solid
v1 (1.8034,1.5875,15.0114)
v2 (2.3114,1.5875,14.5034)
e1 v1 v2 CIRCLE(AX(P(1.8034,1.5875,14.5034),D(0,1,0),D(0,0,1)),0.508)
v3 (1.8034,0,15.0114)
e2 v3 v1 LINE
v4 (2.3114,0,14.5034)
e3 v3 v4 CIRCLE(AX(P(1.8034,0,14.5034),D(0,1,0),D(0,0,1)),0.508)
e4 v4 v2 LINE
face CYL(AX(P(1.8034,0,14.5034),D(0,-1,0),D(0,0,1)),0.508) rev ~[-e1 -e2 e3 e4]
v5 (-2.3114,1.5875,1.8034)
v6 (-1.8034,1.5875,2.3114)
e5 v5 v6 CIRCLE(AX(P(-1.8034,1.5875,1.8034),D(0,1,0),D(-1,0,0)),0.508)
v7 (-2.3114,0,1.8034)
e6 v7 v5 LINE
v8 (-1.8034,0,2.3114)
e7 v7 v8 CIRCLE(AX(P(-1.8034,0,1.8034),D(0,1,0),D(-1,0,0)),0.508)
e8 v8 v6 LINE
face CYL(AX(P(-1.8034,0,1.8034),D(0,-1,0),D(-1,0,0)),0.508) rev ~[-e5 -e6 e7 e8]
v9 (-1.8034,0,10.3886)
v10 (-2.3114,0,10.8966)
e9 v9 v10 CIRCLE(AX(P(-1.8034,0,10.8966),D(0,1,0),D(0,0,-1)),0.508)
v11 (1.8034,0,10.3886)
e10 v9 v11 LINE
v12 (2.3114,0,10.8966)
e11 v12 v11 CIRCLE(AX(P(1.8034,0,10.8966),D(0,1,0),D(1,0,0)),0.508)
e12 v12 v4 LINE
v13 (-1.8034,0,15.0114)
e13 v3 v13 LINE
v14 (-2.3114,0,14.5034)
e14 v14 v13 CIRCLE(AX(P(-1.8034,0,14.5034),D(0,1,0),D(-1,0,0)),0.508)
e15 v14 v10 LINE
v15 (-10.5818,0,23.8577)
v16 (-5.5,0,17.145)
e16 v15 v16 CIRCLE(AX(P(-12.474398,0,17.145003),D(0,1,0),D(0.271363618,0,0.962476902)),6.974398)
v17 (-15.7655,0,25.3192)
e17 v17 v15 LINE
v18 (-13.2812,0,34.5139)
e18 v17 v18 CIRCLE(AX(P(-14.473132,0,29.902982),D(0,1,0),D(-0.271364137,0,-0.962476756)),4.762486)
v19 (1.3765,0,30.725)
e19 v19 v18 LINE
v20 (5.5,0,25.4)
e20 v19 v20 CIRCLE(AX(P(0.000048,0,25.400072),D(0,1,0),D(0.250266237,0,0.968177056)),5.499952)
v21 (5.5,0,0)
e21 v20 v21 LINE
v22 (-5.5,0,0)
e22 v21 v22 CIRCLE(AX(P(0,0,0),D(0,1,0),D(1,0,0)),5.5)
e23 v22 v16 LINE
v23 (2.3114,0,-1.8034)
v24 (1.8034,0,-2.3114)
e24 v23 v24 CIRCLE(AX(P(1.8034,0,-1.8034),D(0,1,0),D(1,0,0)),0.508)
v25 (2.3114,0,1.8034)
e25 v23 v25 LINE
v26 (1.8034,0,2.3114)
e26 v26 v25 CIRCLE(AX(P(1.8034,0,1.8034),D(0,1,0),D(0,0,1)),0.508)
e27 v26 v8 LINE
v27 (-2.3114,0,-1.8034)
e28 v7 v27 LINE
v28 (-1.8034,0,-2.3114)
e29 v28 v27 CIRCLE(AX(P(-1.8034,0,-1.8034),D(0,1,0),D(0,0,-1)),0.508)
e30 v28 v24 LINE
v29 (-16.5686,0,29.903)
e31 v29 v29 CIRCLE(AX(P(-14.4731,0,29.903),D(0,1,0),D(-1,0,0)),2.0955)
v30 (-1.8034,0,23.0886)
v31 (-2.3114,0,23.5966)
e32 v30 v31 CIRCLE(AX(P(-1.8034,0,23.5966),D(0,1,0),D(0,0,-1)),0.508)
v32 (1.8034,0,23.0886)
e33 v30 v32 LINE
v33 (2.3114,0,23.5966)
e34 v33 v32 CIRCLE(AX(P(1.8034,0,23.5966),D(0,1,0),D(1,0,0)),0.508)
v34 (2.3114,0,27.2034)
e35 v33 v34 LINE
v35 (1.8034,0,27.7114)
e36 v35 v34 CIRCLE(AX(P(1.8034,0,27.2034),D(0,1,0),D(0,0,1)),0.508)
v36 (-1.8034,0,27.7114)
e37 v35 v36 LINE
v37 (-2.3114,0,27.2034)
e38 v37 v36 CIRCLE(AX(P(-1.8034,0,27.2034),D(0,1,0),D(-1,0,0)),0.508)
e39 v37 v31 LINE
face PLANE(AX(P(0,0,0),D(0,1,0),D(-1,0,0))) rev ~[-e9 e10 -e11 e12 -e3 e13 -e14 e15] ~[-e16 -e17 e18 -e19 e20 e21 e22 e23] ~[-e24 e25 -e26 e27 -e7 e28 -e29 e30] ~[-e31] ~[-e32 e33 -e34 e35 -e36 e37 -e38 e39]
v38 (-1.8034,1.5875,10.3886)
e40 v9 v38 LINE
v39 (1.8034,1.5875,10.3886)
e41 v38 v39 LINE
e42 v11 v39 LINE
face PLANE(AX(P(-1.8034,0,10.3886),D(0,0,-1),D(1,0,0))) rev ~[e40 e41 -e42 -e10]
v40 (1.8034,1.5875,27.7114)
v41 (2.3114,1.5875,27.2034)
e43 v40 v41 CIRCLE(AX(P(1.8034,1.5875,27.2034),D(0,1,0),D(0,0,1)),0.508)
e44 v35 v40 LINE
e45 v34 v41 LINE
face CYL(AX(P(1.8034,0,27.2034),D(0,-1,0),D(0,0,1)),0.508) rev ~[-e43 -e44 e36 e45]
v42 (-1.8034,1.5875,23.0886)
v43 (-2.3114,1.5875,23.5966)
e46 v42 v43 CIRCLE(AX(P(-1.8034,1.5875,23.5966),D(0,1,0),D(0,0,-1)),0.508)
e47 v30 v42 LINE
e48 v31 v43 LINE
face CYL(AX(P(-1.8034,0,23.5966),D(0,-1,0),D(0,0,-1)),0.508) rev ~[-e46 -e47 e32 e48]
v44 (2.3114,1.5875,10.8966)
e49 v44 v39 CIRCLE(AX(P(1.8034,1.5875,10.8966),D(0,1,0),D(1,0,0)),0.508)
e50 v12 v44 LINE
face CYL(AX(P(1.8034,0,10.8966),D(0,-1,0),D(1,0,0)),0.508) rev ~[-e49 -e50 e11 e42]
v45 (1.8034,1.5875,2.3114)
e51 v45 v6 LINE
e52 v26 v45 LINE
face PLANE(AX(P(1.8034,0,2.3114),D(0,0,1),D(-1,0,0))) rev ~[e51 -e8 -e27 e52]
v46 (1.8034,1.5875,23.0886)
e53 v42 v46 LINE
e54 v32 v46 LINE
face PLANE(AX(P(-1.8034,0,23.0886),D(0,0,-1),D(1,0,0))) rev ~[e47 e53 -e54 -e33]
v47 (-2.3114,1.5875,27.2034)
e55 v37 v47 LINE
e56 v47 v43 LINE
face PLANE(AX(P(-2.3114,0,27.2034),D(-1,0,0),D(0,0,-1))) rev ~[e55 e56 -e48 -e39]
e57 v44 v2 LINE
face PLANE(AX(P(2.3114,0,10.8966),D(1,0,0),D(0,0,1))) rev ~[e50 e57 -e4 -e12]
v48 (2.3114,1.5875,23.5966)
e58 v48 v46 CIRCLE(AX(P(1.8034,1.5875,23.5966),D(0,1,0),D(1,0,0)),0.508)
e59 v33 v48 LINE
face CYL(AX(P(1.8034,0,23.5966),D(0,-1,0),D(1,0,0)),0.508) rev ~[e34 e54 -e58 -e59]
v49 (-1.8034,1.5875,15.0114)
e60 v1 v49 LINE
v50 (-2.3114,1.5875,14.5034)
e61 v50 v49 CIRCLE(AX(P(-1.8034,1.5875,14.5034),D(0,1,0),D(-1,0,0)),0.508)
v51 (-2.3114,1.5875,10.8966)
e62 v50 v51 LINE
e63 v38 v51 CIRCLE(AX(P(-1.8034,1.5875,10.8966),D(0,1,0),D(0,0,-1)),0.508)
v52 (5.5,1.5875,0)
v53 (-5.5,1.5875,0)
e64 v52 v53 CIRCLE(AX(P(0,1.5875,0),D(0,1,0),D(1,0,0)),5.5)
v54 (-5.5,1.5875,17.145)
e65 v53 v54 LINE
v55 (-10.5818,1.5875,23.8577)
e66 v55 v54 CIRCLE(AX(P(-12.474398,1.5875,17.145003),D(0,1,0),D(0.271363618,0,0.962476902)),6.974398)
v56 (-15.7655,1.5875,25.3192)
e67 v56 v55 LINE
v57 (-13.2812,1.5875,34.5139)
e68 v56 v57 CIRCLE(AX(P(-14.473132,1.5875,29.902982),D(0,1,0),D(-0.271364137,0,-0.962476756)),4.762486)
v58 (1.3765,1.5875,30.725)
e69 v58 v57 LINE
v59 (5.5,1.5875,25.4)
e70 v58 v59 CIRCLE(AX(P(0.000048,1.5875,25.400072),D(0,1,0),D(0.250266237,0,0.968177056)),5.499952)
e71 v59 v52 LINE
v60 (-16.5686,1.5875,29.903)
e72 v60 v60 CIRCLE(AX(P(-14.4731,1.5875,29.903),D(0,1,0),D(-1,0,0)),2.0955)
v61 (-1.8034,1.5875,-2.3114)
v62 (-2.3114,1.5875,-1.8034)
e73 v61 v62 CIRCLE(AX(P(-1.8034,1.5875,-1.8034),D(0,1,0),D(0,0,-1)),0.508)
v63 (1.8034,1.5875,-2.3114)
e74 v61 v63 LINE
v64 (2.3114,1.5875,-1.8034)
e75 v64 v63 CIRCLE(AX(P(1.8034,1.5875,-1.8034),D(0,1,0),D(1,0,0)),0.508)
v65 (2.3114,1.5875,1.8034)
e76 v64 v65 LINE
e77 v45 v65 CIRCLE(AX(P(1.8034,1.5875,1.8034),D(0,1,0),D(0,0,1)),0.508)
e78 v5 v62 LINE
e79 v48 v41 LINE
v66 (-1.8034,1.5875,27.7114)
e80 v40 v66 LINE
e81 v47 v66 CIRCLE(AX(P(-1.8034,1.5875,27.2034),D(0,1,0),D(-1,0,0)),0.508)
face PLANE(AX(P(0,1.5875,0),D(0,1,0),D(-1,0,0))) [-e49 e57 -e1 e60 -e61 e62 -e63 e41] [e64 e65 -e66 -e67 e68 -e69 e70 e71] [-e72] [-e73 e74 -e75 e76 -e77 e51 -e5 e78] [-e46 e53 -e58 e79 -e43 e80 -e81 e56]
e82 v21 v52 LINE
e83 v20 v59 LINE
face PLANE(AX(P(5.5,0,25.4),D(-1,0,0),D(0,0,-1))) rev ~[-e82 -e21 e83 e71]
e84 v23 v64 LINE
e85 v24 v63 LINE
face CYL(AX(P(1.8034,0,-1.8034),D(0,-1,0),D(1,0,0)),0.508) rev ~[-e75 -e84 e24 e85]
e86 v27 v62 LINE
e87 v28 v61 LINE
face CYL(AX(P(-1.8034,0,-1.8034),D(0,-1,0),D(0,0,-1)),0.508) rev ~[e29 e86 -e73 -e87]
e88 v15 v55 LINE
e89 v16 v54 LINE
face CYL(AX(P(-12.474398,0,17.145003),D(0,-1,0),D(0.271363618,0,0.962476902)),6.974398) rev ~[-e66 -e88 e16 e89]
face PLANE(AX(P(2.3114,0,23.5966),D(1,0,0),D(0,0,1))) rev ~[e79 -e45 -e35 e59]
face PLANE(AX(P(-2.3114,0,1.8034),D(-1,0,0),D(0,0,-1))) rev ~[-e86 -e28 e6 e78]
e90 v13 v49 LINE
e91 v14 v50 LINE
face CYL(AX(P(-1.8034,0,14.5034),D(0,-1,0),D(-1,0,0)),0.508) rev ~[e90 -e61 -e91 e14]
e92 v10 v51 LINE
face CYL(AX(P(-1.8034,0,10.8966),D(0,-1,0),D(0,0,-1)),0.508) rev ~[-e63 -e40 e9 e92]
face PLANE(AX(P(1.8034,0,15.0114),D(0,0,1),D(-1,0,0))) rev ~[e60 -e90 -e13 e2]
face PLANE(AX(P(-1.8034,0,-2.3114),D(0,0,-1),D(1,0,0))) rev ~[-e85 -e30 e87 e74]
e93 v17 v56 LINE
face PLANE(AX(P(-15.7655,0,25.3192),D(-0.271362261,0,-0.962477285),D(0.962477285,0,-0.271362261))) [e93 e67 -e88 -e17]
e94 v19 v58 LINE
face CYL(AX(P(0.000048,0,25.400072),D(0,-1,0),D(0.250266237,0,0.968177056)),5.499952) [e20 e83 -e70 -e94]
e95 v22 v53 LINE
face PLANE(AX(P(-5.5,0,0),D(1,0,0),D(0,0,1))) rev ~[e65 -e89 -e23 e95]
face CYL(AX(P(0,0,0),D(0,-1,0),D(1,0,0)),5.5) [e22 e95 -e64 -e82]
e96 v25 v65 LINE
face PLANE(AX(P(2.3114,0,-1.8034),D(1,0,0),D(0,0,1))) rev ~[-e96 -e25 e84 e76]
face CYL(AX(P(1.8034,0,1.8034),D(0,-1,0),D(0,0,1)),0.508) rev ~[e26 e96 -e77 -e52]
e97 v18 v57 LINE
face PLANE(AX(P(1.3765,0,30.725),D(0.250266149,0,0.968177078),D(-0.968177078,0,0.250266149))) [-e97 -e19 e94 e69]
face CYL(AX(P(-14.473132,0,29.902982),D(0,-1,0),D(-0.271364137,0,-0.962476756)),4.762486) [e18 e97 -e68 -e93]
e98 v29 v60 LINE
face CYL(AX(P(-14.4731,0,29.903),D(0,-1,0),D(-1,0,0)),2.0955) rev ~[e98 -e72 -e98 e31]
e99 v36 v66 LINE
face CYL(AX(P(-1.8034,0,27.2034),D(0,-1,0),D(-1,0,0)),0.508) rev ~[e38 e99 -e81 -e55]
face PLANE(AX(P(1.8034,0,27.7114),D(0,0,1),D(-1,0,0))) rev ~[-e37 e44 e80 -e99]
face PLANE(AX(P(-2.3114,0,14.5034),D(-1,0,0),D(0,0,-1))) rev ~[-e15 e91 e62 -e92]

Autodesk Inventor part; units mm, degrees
ref_plane "YZ Plane" through (0, 0, 0) normal (1, 0, 0) x (0, 1, 0)
ref_plane "XZ Plane" through (0, 0, 0) normal (0, 1, 0) x (-1, 0, 0)
ref_plane "XY Plane" through (0, 0, 0) normal (0, 0, 1) x (1, 0, 0)
sketch "hole" plane through (0, 0, 0) normal (0, 0, 1) x (1, 0, 0)
  line L0 (16.5616, -7.6441) -> (20.1684, -7.6441)
  line L1 (20.6764, -8.1521) -> (20.6764, -11.7589)
  line L2 (20.1684, -12.2669) -> (16.5616, -12.2669)
  line L3 (16.0536, -11.7589) -> (16.0536, -8.1521)
  line L4 (16.0536, -7.6441) -> (20.6764, -12.2669) construction
  line L5 (20.6764, -7.6441) -> (16.0536, -12.2669) construction
  arc A0 (20.6764, -8.1521) -> (20.1684, -7.6441) centre (20.1684, -8.1521) ccw
  arc A1 (20.1684, -12.2669) -> (20.6764, -11.7589) centre (20.1684, -11.7589) ccw
  arc A2 (16.0536, -11.7589) -> (16.5616, -12.2669) centre (16.5616, -11.7589) ccw
  arc A3 (16.5616, -7.6441) -> (16.0536, -8.1521) centre (16.5616, -8.1521) ccw
  point P0 (18.365, -9.9555)
  dimension "d6" = 4.6228
  dimension "d7" = 4.6228
  dimension "d8" = 0.508
sketch "main" plane through (0, 0, 0) normal (0, 0, 1) x (1, 0, 0)
  arc A0 (12.865, -9.9555) -> (23.865, -9.9555) centre (18.365, -9.9555) ccw
  line L0 (12.865, 15.4445) -> (12.865, -9.9555)
  line L1 (23.865, -9.9555) -> (23.865, 7.1895)
  circle A1 centre (32.8381, 19.9475) radius 2.0955
  arc A2 (34.1305, 15.3637) -> (31.6462, 24.5584) centre (32.8381, 19.9475) ccw
  arc A3 (16.9885, 20.7695) -> (12.865, 15.4445) centre (18.365, 15.4445) ccw
  line L2 (16.9885, 20.7695) -> (31.6462, 24.5584)
  line L3 (34.1305, 15.3637) -> (28.9468, 13.9022)
  arc A4 (28.9468, 13.9022) -> (23.865, 7.1895) centre (30.8394, 7.1895) ccw
  line L4 (16.5616, -7.6441) -> (20.1684, -7.6441)
  line L5 (20.6764, -8.1521) -> (20.6764, -11.7589)
  line L6 (20.1684, -12.2669) -> (16.5616, -12.2669)
  line L7 (16.0536, -11.7589) -> (16.0536, -8.1521)
  line L8 (16.0536, -7.6441) -> (20.6764, -12.2669) construction
  line L9 (20.6764, -7.6441) -> (16.0536, -12.2669) construction
  arc A5 (20.6764, -8.1521) -> (20.1684, -7.6441) centre (20.1684, -8.1521) ccw
  arc A6 (20.1684, -12.2669) -> (20.6764, -11.7589) centre (20.1684, -11.7589) ccw
  arc A7 (16.0536, -11.7589) -> (16.5616, -12.2669) centre (16.5616, -11.7589) ccw
  arc A8 (16.5616, -7.6441) -> (16.0536, -8.1521) centre (16.5616, -8.1521) ccw
  line L10 (16.5616, 5.0559) -> (20.1684, 5.0559)
  line L11 (20.6764, 4.5479) -> (20.6764, 0.9411)
  line L12 (20.1684, 0.4331) -> (16.5616, 0.4331)
  line L13 (16.0536, 0.9411) -> (16.0536, 4.5479)
  line L14 (16.0536, 5.0559) -> (20.6764, 0.4331) construction
  line L15 (20.6764, 5.0559) -> (16.0536, 0.4331) construction
  arc A9 (20.6764, 4.5479) -> (20.1684, 5.0559) centre (20.1684, 4.5479) ccw
  arc A10 (20.1684, 0.4331) -> (20.6764, 0.9411) centre (20.1684, 0.9411) ccw
  arc A11 (16.0536, 0.9411) -> (16.5616, 0.4331) centre (16.5616, 0.9411) ccw
  arc A12 (16.5616, 5.0559) -> (16.0536, 4.5479) centre (16.5616, 4.5479) ccw
  line L16 (16.5616, 17.7559) -> (20.1684, 17.7559)
  line L17 (20.6764, 17.2479) -> (20.6764, 13.6411)
  line L18 (20.1684, 13.1331) -> (16.5616, 13.1331)
  line L19 (16.0536, 13.6411) -> (16.0536, 17.2479)
  line L20 (16.0536, 17.7559) -> (20.6764, 13.1331) construction
  line L21 (20.6764, 17.7559) -> (16.0536, 13.1331) construction
  arc A13 (20.6764, 17.2479) -> (20.1684, 17.7559) centre (20.1684, 17.2479) ccw
  arc A14 (20.1684, 13.1331) -> (20.6764, 13.6411) centre (20.1684, 13.6411) ccw
  arc A15 (16.0536, 13.6411) -> (16.5616, 13.1331) centre (16.5616, 13.6411) ccw
  arc A16 (16.5616, 17.7559) -> (16.0536, 17.2479) centre (16.5616, 17.2479) ccw
  point P0 (22.8879, 4.6952)
  dimension "d9" = 12.7
  dimension "d10" = 12.7
  dimension "d12" = 17.145
sketch "Sketch1" plane through (0, 0, 0) normal (0, 1, 0) x (-1, 0, 0)
  arc A0 (-5.5, 0) -> (5.5, 0) centre (0, 0) ccw
  line L0 (-5.5, 25.4) -> (-5.5, 0)
  line L1 (5.5, 0) -> (5.5, 17.145)
  circle A1 centre (14.4731, 29.903) radius 2.0955
  arc A2 (15.7655, 25.3192) -> (13.2812, 34.5139) centre (14.4731, 29.903) ccw
  arc A3 (-1.3765, 30.725) -> (-5.5, 25.4) centre (0, 25.4) ccw
  line L2 (-1.3765, 30.725) -> (13.2812, 34.5139)
  line L3 (15.7655, 25.3192) -> (10.5818, 23.8577)
  arc A4 (10.5818, 23.8577) -> (5.5, 17.145) centre (12.4744, 17.145) ccw
  line L4 (-1.8034, 2.3114) -> (1.8034, 2.3114)
  line L5 (2.3114, 1.8034) -> (2.3114, -1.8034)
  line L6 (1.8034, -2.3114) -> (-1.8034, -2.3114)
  line L7 (-2.3114, -1.8034) -> (-2.3114, 1.8034)
  line L8 (-2.3114, 2.3114) -> (2.3114, -2.3114) construction
  line L9 (2.3114, 2.3114) -> (-2.3114, -2.3114) construction
  arc A5 (2.3114, 1.8034) -> (1.8034, 2.3114) centre (1.8034, 1.8034) ccw
  arc A6 (1.8034, -2.3114) -> (2.3114, -1.8034) centre (1.8034, -1.8034) ccw
  arc A7 (-2.3114, -1.8034) -> (-1.8034, -2.3114) centre (-1.8034, -1.8034) ccw
  arc A8 (-1.8034, 2.3114) -> (-2.3114, 1.8034) centre (-1.8034, 1.8034) ccw
  line L10 (-1.8034, 15.0114) -> (1.8034, 15.0114)
  line L11 (2.3114, 14.5034) -> (2.3114, 10.8966)
  line L12 (1.8034, 10.3886) -> (-1.8034, 10.3886)
  line L13 (-2.3114, 10.8966) -> (-2.3114, 14.5034)
  line L14 (-2.3114, 15.0114) -> (2.3114, 10.3886) construction
  line L15 (2.3114, 15.0114) -> (-2.3114, 10.3886) construction
  arc A9 (2.3114, 14.5034) -> (1.8034, 15.0114) centre (1.8034, 14.5034) ccw
  arc A10 (1.8034, 10.3886) -> (2.3114, 10.8966) centre (1.8034, 10.8966) ccw
  arc A11 (-2.3114, 10.8966) -> (-1.8034, 10.3886) centre (-1.8034, 10.8966) ccw
  arc A12 (-1.8034, 15.0114) -> (-2.3114, 14.5034) centre (-1.8034, 14.5034) ccw
  line L16 (-1.8034, 27.7114) -> (1.8034, 27.7114)
  line L17 (2.3114, 27.2034) -> (2.3114, 23.5966)
  line L18 (1.8034, 23.0886) -> (-1.8034, 23.0886)
  line L19 (-2.3114, 23.5966) -> (-2.3114, 27.2034)
  line L20 (-2.3114, 27.7114) -> (2.3114, 23.0886) construction
  line L21 (2.3114, 27.7114) -> (-2.3114, 23.0886) construction
  arc A13 (2.3114, 27.2034) -> (1.8034, 27.7114) centre (1.8034, 27.2034) ccw
  arc A14 (1.8034, 23.0886) -> (2.3114, 23.5966) centre (1.8034, 23.5966) ccw
  arc A15 (-2.3114, 23.5966) -> (-1.8034, 23.0886) centre (-1.8034, 23.5966) ccw
  arc A16 (-1.8034, 27.7114) -> (-2.3114, 27.2034) centre (-1.8034, 27.2034) ccw
extrude "Extrusion1" add sketch "Sketch1" along normal blind 1.5875
properties part number "bent_gusset_improved" material "Acetal Resin, White"
